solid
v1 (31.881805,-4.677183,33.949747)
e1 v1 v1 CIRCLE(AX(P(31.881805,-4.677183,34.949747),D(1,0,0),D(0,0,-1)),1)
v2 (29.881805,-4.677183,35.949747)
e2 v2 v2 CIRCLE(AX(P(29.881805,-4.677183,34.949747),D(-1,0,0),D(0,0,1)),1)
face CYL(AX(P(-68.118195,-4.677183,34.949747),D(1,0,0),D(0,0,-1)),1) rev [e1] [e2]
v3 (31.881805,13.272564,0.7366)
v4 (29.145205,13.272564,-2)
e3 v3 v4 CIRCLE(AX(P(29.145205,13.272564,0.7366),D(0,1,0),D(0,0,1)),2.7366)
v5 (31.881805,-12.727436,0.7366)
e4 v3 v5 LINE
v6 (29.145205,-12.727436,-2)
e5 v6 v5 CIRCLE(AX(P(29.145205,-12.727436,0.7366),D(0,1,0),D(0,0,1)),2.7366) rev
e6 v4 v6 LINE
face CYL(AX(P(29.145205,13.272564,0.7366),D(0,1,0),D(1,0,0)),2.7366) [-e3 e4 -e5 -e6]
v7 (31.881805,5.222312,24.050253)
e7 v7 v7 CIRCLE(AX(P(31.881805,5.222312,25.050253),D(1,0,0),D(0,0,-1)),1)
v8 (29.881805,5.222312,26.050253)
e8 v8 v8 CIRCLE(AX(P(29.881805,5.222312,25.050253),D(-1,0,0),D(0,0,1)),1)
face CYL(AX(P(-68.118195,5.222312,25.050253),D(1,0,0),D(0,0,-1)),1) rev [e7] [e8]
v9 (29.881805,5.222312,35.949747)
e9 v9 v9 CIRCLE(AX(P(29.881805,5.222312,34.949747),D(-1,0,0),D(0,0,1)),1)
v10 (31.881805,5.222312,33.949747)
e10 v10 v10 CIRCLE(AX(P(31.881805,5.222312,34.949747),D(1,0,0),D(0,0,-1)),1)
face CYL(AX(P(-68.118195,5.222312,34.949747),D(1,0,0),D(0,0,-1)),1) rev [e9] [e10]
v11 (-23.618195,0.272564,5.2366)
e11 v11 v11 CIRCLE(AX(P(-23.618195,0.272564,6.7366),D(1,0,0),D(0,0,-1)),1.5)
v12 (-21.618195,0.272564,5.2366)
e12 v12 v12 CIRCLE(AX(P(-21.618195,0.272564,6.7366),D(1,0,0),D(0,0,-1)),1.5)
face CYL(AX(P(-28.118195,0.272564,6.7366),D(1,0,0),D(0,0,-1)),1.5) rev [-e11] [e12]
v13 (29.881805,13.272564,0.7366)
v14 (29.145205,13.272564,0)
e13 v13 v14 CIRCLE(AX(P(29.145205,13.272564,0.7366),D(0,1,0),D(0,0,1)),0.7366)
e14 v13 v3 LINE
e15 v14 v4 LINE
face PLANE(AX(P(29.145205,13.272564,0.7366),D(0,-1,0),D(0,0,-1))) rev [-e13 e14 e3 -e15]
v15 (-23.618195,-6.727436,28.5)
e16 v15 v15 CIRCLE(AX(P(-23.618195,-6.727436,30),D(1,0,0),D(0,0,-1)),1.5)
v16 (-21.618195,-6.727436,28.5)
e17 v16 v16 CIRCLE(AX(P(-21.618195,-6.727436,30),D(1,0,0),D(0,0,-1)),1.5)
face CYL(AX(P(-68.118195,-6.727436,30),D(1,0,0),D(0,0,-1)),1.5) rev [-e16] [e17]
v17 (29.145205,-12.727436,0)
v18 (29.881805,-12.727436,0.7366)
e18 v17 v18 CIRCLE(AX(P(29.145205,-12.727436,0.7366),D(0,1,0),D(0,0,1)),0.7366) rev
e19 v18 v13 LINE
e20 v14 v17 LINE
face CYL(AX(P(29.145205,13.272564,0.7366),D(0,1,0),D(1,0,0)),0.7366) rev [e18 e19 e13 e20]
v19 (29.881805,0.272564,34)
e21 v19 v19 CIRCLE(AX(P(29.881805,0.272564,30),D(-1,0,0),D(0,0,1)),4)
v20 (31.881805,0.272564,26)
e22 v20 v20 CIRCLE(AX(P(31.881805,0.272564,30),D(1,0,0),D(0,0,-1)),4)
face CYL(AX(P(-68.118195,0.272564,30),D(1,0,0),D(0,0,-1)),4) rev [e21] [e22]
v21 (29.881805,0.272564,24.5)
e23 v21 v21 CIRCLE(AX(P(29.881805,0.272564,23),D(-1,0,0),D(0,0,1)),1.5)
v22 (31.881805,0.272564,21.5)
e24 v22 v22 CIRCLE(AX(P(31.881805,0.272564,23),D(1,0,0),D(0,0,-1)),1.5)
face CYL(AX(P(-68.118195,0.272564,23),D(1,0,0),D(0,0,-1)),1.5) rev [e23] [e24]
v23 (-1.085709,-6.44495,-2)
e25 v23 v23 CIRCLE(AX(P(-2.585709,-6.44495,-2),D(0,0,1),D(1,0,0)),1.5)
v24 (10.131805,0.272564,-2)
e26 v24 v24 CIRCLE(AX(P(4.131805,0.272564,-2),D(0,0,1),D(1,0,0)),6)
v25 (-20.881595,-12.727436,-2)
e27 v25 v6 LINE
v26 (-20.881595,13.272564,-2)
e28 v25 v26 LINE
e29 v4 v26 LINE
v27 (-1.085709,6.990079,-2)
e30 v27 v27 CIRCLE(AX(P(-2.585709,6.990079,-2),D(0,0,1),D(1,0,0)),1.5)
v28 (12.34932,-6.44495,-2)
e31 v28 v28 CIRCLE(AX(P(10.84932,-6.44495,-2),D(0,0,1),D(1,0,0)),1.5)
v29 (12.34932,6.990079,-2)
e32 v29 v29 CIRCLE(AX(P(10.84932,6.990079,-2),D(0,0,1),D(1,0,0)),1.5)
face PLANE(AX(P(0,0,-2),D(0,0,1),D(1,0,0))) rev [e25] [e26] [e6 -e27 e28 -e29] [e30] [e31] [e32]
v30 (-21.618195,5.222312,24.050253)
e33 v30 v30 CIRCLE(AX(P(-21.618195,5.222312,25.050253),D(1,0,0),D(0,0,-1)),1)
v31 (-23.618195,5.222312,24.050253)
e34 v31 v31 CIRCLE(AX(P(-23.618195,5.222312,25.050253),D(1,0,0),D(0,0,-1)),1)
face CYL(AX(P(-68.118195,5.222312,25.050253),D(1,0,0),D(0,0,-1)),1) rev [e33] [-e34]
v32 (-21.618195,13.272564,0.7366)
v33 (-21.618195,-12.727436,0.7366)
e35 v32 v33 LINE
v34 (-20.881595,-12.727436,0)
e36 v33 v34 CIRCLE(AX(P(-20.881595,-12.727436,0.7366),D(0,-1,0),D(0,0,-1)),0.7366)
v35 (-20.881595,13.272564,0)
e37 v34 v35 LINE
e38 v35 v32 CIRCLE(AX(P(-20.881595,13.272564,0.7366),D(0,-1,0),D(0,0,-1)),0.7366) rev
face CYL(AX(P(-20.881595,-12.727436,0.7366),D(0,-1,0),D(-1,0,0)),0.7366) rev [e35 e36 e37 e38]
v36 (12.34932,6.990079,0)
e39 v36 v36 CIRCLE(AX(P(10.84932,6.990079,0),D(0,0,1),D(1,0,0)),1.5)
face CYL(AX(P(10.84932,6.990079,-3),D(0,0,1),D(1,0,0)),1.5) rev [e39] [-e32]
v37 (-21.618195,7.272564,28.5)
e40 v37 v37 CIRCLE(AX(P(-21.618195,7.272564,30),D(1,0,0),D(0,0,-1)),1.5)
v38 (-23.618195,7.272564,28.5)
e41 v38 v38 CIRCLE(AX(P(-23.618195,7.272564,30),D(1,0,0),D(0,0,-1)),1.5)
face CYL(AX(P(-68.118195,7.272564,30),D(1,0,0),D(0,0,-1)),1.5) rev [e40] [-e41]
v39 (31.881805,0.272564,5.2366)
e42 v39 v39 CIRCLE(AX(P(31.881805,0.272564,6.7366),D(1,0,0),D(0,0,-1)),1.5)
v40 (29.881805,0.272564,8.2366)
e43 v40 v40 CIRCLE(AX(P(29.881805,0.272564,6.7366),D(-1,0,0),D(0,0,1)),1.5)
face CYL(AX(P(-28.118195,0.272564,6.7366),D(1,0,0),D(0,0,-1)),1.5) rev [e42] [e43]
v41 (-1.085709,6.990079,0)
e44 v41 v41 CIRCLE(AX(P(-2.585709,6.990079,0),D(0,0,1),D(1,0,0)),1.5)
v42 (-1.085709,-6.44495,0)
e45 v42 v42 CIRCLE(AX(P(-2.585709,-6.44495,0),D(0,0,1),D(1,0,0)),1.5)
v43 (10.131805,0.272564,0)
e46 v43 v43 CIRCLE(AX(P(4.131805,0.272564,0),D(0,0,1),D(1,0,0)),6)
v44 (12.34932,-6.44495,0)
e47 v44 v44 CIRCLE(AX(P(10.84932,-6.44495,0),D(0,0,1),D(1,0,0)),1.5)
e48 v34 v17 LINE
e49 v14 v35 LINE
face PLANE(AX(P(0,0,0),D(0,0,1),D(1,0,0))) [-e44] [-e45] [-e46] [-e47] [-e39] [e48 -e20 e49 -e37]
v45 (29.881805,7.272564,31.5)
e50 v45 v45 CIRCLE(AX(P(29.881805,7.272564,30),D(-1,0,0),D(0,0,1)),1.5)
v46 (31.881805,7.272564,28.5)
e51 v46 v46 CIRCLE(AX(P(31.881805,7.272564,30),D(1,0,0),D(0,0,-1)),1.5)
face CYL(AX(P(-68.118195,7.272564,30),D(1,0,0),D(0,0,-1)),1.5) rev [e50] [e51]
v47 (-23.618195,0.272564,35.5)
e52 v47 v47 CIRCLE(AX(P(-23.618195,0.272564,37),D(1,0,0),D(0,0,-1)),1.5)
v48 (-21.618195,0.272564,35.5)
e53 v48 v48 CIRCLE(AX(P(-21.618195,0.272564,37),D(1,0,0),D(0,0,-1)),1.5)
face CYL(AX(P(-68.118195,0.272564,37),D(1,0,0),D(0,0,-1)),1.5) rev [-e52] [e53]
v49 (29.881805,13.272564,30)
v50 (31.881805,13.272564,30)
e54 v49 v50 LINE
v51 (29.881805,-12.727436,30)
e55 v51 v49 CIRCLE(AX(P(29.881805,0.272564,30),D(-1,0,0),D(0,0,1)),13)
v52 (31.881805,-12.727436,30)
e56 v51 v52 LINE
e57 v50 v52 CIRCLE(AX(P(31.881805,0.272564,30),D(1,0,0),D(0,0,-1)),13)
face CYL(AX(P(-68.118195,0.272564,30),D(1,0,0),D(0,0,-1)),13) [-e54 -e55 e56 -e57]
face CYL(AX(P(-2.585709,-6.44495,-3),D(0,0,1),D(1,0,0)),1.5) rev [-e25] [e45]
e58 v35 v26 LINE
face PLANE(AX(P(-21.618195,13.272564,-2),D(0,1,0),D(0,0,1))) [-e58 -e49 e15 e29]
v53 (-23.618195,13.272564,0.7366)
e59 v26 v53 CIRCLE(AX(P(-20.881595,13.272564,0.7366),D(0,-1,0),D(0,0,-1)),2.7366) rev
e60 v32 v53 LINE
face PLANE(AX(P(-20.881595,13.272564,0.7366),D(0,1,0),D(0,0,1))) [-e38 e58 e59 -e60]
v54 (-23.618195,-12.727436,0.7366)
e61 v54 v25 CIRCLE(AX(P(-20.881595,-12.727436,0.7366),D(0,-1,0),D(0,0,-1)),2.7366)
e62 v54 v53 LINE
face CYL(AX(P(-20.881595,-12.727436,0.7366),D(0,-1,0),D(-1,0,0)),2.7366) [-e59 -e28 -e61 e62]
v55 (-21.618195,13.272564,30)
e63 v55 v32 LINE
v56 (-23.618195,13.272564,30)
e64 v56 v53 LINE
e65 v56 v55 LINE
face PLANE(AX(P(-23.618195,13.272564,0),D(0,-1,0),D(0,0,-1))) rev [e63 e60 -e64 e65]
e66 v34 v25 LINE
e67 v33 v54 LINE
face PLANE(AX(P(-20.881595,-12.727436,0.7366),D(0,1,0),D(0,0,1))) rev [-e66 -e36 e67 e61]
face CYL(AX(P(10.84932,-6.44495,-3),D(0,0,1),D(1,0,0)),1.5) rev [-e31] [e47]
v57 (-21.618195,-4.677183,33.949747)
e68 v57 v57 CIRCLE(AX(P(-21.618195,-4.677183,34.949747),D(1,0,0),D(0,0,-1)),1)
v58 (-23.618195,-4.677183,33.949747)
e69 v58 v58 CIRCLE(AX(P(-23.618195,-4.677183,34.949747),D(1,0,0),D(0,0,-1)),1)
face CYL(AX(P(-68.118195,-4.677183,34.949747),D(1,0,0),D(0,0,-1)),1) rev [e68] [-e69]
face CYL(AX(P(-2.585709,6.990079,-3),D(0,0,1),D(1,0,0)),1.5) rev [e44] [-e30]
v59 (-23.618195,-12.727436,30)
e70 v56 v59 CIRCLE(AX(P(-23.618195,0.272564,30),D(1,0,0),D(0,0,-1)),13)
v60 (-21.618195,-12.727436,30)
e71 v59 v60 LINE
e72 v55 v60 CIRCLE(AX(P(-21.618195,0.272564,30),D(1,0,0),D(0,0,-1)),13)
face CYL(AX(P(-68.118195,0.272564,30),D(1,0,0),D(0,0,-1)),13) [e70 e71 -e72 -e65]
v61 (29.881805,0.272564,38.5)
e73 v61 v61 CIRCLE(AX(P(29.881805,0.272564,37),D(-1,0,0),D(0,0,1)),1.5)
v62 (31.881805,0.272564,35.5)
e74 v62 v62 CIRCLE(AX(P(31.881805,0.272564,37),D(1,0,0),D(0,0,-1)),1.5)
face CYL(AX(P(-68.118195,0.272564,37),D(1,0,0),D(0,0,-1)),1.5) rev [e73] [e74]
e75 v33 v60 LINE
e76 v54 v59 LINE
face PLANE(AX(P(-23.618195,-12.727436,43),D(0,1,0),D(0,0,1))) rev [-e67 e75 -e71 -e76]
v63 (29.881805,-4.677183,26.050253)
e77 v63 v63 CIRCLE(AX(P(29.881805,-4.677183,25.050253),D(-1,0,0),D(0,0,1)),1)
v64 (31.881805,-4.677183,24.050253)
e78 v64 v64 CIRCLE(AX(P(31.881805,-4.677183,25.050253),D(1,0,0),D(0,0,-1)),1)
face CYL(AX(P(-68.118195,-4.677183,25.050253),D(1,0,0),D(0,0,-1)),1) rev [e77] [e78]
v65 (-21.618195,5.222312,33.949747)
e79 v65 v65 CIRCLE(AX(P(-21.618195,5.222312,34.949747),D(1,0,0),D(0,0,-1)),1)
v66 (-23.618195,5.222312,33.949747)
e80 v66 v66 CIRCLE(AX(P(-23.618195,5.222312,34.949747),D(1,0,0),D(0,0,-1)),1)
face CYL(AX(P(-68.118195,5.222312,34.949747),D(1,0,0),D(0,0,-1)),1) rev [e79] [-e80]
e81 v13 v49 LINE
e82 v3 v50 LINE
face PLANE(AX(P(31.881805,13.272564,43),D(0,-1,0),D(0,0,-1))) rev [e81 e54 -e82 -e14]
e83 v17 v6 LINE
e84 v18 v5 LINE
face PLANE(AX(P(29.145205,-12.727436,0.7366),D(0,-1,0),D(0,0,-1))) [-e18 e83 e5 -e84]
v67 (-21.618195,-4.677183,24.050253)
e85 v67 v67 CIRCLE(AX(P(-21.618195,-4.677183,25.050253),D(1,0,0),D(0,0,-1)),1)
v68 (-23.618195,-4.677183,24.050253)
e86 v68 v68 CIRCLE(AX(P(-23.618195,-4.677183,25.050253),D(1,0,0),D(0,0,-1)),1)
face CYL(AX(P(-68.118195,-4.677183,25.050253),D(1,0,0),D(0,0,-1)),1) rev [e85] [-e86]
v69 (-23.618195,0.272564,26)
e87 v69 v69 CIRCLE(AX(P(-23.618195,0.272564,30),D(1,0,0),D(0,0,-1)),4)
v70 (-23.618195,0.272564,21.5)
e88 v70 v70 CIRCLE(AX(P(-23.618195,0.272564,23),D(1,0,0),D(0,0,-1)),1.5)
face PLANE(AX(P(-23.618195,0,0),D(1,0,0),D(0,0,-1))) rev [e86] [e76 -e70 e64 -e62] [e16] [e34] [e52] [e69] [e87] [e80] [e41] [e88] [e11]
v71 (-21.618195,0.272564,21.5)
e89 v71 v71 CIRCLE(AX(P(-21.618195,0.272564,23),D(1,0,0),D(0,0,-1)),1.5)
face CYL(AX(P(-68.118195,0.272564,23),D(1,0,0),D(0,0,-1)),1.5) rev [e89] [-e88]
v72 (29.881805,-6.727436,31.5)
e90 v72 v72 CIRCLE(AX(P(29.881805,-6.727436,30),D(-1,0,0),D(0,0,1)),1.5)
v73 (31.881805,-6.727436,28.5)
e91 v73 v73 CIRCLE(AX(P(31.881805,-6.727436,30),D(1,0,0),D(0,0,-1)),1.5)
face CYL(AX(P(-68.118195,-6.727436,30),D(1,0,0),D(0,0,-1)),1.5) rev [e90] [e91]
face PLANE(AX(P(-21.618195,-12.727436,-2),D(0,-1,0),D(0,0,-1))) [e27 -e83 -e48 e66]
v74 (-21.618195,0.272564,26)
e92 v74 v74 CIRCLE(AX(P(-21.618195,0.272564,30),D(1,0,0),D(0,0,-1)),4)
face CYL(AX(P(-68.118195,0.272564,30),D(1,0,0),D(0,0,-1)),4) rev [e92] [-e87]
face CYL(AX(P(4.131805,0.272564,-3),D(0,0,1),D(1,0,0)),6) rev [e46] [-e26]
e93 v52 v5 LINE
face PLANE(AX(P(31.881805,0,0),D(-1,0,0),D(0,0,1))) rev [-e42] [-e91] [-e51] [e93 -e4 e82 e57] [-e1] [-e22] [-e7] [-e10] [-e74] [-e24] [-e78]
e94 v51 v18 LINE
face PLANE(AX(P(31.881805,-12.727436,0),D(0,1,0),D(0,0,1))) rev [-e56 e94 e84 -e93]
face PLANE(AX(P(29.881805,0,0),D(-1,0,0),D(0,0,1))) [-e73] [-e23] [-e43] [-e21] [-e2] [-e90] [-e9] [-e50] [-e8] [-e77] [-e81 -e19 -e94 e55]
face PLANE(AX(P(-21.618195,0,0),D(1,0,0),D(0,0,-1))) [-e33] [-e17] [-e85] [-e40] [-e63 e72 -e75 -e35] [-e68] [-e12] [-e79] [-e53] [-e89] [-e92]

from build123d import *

# Parameters (mm, degrees)
SKETCH_1_W                       = 51.5
SKETCH_1_H                       = 26
SM_BASE_FLANGE_1_DEPTH           = 2
SM_EDGE_FLANGE_1_STRIP_W         = 9.4732
SM_EDGE_FLANGE_1_STRIP_H         = 2
SM_EDGE_FLANGE_1_STRIP_CUT_DEPTH = 26
SM_EDGE_FLANGE_1_DEPTH           = 26
SM_EDGE_FLANGE_2_STRIP_W         = 9.4732
SM_EDGE_FLANGE_2_STRIP_H         = 2
SM_EDGE_FLANGE_2_STRIP_CUT_DEPTH = 26
SM_EDGE_FLANGE_2_DEPTH           = 26
CUT_EXTRUDE_3_DEPTH              = 100
SKETCH_21_R                      = 1
SKETCH_21_R_2                    = 1.5
SKETCH_21_R_3                    = 4
CUT_EXTRUDE_5_DEPTH              = 100
SKETCH_22_R                      = 1.5
SKETCH_22_R_2                    = 6
CUT_EXTRUDE_6_DEPTH              = 3
SKETCH_23_R                      = 1.5
CUT_EXTRUDE_7_DEPTH              = 60


# Sheet-metal steps are written as plain solids
with BuildPart() as part:
    # Sketch 1 → 基体-法兰1 (new body)
    with BuildSketch(Plane.XY):
        with Locations((4.131805158, 0.27256447)):
            Rectangle(SKETCH_1_W, SKETCH_1_H)
    extrude(amount=-SM_BASE_FLANGE_1_DEPTH)

    # 边线-法兰1 strip (across the edge) → 边线-法兰1 strip cut (cut)
    with BuildSketch(Plane(origin=(29.881805158, -12.72743553, 0), x_dir=(-1, 0, 0), z_dir=(0, 1, 0))):
        with Locations((-4, -1)):
            Rectangle(SM_EDGE_FLANGE_1_STRIP_W, SM_EDGE_FLANGE_1_STRIP_H)
    extrude(amount=SM_EDGE_FLANGE_1_STRIP_CUT_DEPTH, mode=Mode.SUBTRACT)

    # 边线-法兰1 section (across the edge) → 边线-法兰1 (add)
    with BuildSketch(Plane(origin=(29.881805158, -12.72743553, 0), x_dir=(-1, 0, 0), z_dir=(0, 1, 0))):
        with BuildLine():
            Line((-2, 0.7366), (-2, 43))
            Line((-2, 43), (0, 43))
            Line((0, 43), (0, 0.7366))
            ThreePointArc((0, 0.7366), (0.215745145, 0.215745145), (0.7366, 0))
            Line((0.7366, 0), (0.7366, -2))
            ThreePointArc((0.7366, -2), (-1.198468417, -1.198468417), (-2, 0.7366))
        make_face()
    extrude(amount=SM_EDGE_FLANGE_1_DEPTH)

    # 边线-法兰2 strip (across the edge) → 边线-法兰2 strip cut (cut)
    with BuildSketch(Plane(origin=(-21.618194842, 13.27256447, 0), x_dir=(1, 0, 0), z_dir=(0, -1, 0))):
        with Locations((-4, -1)):
            Rectangle(SM_EDGE_FLANGE_2_STRIP_W, SM_EDGE_FLANGE_2_STRIP_H)
    extrude(amount=SM_EDGE_FLANGE_2_STRIP_CUT_DEPTH, mode=Mode.SUBTRACT)

    # 边线-法兰2 section (across the edge) → 边线-法兰2 (add)
    with BuildSketch(Plane(origin=(-21.618194842, 13.27256447, 0), x_dir=(1, 0, 0), z_dir=(0, -1, 0))):
        with BuildLine():
            Line((-2, 0.7366), (-2, 43))
            Line((-2, 43), (0, 43))
            Line((0, 43), (0, 0.7366))
            ThreePointArc((0, 0.7366), (0.215745145, 0.215745145), (0.7366, 0))
            Line((0.7366, 0), (0.7366, -2))
            ThreePointArc((0.7366, -2), (-1.198468417, -1.198468417), (-2, 0.7366))
        make_face()
    extrude(amount=SM_EDGE_FLANGE_2_DEPTH)

    # 草图14 → 切除-拉伸3 (cut)
    with BuildSketch(Plane(origin=(31.881805158, 0, 0), x_dir=(0, 0, -1), z_dir=(1, 0, 0))):
        with BuildLine():
            ThreePointArc((-43, 0.27256447), (-39.192388155, 9.464952625), (-30, 13.27256447))
            Line((-30, 13.27256447), (-43, 13.27256447))
            Line((-43, 13.27256447), (-43, 0.27256447))
        make_face()
        with BuildLine():
            Line((-43, -12.72743553), (-30, -12.72743553))
            ThreePointArc((-30, -12.72743553), (-39.192388155, -8.919823686), (-43, 0.27256447))
            Line((-43, 0.27256447), (-43, -12.72743553))
        make_face()
    extrude(amount=-CUT_EXTRUDE_3_DEPTH, mode=Mode.SUBTRACT)

    # 草图21 → 切除-拉伸5 (cut)
    with BuildSketch(Plane(origin=(31.881805158, 0, 0), x_dir=(0, 0, -1), z_dir=(1, 0, 0))):
        with Locations((-25.050252532, 5.222311938)):
            Circle(SKETCH_21_R)
        with Locations((-23, 0.27256447)):
            Circle(SKETCH_21_R_2)
        with Locations((-25.050252532, -4.677182998)):
            Circle(SKETCH_21_R)
        with Locations((-30, -6.72743553)):
            Circle(SKETCH_21_R_2)
        with Locations((-34.949747468, -4.677182998)):
            Circle(SKETCH_21_R)
        with Locations((-37, 0.27256447)):
            Circle(SKETCH_21_R_2)
        with Locations((-34.949747468, 5.222311938)):
            Circle(SKETCH_21_R)
        with Locations((-30, 7.27256447)):
            Circle(SKETCH_21_R_2)
        with Locations((-30, 0.27256447)):
            Circle(SKETCH_21_R_3)
    extrude(amount=-CUT_EXTRUDE_5_DEPTH, mode=Mode.SUBTRACT)

    # 草图22 → 切除-拉伸6 (cut)
    with BuildSketch(Plane.XY):
        with Locations((10.849319579, 6.990078891)):
            Circle(SKETCH_22_R)
        with Locations((10.849319579, -6.444949951)):
            Circle(SKETCH_22_R)
        with Locations((-2.585709264, -6.444949951)):
            Circle(SKETCH_22_R)
        with Locations((-2.585709264, 6.990078891)):
            Circle(SKETCH_22_R)
        with Locations((4.131805158, 0.27256447)):
            Circle(SKETCH_22_R_2)
    extrude(amount=-CUT_EXTRUDE_6_DEPTH, mode=Mode.SUBTRACT)

    # 草图23 → 切除-拉伸7 (cut)
    with BuildSketch(Plane(origin=(31.881805158, 0, 0), x_dir=(0, 0, -1), z_dir=(1, 0, 0))):
        with Locations((-6.7366, 0.27256447)):
            Circle(SKETCH_23_R)
    extrude(amount=-CUT_EXTRUDE_7_DEPTH, mode=Mode.SUBTRACT)


solid = part.part
